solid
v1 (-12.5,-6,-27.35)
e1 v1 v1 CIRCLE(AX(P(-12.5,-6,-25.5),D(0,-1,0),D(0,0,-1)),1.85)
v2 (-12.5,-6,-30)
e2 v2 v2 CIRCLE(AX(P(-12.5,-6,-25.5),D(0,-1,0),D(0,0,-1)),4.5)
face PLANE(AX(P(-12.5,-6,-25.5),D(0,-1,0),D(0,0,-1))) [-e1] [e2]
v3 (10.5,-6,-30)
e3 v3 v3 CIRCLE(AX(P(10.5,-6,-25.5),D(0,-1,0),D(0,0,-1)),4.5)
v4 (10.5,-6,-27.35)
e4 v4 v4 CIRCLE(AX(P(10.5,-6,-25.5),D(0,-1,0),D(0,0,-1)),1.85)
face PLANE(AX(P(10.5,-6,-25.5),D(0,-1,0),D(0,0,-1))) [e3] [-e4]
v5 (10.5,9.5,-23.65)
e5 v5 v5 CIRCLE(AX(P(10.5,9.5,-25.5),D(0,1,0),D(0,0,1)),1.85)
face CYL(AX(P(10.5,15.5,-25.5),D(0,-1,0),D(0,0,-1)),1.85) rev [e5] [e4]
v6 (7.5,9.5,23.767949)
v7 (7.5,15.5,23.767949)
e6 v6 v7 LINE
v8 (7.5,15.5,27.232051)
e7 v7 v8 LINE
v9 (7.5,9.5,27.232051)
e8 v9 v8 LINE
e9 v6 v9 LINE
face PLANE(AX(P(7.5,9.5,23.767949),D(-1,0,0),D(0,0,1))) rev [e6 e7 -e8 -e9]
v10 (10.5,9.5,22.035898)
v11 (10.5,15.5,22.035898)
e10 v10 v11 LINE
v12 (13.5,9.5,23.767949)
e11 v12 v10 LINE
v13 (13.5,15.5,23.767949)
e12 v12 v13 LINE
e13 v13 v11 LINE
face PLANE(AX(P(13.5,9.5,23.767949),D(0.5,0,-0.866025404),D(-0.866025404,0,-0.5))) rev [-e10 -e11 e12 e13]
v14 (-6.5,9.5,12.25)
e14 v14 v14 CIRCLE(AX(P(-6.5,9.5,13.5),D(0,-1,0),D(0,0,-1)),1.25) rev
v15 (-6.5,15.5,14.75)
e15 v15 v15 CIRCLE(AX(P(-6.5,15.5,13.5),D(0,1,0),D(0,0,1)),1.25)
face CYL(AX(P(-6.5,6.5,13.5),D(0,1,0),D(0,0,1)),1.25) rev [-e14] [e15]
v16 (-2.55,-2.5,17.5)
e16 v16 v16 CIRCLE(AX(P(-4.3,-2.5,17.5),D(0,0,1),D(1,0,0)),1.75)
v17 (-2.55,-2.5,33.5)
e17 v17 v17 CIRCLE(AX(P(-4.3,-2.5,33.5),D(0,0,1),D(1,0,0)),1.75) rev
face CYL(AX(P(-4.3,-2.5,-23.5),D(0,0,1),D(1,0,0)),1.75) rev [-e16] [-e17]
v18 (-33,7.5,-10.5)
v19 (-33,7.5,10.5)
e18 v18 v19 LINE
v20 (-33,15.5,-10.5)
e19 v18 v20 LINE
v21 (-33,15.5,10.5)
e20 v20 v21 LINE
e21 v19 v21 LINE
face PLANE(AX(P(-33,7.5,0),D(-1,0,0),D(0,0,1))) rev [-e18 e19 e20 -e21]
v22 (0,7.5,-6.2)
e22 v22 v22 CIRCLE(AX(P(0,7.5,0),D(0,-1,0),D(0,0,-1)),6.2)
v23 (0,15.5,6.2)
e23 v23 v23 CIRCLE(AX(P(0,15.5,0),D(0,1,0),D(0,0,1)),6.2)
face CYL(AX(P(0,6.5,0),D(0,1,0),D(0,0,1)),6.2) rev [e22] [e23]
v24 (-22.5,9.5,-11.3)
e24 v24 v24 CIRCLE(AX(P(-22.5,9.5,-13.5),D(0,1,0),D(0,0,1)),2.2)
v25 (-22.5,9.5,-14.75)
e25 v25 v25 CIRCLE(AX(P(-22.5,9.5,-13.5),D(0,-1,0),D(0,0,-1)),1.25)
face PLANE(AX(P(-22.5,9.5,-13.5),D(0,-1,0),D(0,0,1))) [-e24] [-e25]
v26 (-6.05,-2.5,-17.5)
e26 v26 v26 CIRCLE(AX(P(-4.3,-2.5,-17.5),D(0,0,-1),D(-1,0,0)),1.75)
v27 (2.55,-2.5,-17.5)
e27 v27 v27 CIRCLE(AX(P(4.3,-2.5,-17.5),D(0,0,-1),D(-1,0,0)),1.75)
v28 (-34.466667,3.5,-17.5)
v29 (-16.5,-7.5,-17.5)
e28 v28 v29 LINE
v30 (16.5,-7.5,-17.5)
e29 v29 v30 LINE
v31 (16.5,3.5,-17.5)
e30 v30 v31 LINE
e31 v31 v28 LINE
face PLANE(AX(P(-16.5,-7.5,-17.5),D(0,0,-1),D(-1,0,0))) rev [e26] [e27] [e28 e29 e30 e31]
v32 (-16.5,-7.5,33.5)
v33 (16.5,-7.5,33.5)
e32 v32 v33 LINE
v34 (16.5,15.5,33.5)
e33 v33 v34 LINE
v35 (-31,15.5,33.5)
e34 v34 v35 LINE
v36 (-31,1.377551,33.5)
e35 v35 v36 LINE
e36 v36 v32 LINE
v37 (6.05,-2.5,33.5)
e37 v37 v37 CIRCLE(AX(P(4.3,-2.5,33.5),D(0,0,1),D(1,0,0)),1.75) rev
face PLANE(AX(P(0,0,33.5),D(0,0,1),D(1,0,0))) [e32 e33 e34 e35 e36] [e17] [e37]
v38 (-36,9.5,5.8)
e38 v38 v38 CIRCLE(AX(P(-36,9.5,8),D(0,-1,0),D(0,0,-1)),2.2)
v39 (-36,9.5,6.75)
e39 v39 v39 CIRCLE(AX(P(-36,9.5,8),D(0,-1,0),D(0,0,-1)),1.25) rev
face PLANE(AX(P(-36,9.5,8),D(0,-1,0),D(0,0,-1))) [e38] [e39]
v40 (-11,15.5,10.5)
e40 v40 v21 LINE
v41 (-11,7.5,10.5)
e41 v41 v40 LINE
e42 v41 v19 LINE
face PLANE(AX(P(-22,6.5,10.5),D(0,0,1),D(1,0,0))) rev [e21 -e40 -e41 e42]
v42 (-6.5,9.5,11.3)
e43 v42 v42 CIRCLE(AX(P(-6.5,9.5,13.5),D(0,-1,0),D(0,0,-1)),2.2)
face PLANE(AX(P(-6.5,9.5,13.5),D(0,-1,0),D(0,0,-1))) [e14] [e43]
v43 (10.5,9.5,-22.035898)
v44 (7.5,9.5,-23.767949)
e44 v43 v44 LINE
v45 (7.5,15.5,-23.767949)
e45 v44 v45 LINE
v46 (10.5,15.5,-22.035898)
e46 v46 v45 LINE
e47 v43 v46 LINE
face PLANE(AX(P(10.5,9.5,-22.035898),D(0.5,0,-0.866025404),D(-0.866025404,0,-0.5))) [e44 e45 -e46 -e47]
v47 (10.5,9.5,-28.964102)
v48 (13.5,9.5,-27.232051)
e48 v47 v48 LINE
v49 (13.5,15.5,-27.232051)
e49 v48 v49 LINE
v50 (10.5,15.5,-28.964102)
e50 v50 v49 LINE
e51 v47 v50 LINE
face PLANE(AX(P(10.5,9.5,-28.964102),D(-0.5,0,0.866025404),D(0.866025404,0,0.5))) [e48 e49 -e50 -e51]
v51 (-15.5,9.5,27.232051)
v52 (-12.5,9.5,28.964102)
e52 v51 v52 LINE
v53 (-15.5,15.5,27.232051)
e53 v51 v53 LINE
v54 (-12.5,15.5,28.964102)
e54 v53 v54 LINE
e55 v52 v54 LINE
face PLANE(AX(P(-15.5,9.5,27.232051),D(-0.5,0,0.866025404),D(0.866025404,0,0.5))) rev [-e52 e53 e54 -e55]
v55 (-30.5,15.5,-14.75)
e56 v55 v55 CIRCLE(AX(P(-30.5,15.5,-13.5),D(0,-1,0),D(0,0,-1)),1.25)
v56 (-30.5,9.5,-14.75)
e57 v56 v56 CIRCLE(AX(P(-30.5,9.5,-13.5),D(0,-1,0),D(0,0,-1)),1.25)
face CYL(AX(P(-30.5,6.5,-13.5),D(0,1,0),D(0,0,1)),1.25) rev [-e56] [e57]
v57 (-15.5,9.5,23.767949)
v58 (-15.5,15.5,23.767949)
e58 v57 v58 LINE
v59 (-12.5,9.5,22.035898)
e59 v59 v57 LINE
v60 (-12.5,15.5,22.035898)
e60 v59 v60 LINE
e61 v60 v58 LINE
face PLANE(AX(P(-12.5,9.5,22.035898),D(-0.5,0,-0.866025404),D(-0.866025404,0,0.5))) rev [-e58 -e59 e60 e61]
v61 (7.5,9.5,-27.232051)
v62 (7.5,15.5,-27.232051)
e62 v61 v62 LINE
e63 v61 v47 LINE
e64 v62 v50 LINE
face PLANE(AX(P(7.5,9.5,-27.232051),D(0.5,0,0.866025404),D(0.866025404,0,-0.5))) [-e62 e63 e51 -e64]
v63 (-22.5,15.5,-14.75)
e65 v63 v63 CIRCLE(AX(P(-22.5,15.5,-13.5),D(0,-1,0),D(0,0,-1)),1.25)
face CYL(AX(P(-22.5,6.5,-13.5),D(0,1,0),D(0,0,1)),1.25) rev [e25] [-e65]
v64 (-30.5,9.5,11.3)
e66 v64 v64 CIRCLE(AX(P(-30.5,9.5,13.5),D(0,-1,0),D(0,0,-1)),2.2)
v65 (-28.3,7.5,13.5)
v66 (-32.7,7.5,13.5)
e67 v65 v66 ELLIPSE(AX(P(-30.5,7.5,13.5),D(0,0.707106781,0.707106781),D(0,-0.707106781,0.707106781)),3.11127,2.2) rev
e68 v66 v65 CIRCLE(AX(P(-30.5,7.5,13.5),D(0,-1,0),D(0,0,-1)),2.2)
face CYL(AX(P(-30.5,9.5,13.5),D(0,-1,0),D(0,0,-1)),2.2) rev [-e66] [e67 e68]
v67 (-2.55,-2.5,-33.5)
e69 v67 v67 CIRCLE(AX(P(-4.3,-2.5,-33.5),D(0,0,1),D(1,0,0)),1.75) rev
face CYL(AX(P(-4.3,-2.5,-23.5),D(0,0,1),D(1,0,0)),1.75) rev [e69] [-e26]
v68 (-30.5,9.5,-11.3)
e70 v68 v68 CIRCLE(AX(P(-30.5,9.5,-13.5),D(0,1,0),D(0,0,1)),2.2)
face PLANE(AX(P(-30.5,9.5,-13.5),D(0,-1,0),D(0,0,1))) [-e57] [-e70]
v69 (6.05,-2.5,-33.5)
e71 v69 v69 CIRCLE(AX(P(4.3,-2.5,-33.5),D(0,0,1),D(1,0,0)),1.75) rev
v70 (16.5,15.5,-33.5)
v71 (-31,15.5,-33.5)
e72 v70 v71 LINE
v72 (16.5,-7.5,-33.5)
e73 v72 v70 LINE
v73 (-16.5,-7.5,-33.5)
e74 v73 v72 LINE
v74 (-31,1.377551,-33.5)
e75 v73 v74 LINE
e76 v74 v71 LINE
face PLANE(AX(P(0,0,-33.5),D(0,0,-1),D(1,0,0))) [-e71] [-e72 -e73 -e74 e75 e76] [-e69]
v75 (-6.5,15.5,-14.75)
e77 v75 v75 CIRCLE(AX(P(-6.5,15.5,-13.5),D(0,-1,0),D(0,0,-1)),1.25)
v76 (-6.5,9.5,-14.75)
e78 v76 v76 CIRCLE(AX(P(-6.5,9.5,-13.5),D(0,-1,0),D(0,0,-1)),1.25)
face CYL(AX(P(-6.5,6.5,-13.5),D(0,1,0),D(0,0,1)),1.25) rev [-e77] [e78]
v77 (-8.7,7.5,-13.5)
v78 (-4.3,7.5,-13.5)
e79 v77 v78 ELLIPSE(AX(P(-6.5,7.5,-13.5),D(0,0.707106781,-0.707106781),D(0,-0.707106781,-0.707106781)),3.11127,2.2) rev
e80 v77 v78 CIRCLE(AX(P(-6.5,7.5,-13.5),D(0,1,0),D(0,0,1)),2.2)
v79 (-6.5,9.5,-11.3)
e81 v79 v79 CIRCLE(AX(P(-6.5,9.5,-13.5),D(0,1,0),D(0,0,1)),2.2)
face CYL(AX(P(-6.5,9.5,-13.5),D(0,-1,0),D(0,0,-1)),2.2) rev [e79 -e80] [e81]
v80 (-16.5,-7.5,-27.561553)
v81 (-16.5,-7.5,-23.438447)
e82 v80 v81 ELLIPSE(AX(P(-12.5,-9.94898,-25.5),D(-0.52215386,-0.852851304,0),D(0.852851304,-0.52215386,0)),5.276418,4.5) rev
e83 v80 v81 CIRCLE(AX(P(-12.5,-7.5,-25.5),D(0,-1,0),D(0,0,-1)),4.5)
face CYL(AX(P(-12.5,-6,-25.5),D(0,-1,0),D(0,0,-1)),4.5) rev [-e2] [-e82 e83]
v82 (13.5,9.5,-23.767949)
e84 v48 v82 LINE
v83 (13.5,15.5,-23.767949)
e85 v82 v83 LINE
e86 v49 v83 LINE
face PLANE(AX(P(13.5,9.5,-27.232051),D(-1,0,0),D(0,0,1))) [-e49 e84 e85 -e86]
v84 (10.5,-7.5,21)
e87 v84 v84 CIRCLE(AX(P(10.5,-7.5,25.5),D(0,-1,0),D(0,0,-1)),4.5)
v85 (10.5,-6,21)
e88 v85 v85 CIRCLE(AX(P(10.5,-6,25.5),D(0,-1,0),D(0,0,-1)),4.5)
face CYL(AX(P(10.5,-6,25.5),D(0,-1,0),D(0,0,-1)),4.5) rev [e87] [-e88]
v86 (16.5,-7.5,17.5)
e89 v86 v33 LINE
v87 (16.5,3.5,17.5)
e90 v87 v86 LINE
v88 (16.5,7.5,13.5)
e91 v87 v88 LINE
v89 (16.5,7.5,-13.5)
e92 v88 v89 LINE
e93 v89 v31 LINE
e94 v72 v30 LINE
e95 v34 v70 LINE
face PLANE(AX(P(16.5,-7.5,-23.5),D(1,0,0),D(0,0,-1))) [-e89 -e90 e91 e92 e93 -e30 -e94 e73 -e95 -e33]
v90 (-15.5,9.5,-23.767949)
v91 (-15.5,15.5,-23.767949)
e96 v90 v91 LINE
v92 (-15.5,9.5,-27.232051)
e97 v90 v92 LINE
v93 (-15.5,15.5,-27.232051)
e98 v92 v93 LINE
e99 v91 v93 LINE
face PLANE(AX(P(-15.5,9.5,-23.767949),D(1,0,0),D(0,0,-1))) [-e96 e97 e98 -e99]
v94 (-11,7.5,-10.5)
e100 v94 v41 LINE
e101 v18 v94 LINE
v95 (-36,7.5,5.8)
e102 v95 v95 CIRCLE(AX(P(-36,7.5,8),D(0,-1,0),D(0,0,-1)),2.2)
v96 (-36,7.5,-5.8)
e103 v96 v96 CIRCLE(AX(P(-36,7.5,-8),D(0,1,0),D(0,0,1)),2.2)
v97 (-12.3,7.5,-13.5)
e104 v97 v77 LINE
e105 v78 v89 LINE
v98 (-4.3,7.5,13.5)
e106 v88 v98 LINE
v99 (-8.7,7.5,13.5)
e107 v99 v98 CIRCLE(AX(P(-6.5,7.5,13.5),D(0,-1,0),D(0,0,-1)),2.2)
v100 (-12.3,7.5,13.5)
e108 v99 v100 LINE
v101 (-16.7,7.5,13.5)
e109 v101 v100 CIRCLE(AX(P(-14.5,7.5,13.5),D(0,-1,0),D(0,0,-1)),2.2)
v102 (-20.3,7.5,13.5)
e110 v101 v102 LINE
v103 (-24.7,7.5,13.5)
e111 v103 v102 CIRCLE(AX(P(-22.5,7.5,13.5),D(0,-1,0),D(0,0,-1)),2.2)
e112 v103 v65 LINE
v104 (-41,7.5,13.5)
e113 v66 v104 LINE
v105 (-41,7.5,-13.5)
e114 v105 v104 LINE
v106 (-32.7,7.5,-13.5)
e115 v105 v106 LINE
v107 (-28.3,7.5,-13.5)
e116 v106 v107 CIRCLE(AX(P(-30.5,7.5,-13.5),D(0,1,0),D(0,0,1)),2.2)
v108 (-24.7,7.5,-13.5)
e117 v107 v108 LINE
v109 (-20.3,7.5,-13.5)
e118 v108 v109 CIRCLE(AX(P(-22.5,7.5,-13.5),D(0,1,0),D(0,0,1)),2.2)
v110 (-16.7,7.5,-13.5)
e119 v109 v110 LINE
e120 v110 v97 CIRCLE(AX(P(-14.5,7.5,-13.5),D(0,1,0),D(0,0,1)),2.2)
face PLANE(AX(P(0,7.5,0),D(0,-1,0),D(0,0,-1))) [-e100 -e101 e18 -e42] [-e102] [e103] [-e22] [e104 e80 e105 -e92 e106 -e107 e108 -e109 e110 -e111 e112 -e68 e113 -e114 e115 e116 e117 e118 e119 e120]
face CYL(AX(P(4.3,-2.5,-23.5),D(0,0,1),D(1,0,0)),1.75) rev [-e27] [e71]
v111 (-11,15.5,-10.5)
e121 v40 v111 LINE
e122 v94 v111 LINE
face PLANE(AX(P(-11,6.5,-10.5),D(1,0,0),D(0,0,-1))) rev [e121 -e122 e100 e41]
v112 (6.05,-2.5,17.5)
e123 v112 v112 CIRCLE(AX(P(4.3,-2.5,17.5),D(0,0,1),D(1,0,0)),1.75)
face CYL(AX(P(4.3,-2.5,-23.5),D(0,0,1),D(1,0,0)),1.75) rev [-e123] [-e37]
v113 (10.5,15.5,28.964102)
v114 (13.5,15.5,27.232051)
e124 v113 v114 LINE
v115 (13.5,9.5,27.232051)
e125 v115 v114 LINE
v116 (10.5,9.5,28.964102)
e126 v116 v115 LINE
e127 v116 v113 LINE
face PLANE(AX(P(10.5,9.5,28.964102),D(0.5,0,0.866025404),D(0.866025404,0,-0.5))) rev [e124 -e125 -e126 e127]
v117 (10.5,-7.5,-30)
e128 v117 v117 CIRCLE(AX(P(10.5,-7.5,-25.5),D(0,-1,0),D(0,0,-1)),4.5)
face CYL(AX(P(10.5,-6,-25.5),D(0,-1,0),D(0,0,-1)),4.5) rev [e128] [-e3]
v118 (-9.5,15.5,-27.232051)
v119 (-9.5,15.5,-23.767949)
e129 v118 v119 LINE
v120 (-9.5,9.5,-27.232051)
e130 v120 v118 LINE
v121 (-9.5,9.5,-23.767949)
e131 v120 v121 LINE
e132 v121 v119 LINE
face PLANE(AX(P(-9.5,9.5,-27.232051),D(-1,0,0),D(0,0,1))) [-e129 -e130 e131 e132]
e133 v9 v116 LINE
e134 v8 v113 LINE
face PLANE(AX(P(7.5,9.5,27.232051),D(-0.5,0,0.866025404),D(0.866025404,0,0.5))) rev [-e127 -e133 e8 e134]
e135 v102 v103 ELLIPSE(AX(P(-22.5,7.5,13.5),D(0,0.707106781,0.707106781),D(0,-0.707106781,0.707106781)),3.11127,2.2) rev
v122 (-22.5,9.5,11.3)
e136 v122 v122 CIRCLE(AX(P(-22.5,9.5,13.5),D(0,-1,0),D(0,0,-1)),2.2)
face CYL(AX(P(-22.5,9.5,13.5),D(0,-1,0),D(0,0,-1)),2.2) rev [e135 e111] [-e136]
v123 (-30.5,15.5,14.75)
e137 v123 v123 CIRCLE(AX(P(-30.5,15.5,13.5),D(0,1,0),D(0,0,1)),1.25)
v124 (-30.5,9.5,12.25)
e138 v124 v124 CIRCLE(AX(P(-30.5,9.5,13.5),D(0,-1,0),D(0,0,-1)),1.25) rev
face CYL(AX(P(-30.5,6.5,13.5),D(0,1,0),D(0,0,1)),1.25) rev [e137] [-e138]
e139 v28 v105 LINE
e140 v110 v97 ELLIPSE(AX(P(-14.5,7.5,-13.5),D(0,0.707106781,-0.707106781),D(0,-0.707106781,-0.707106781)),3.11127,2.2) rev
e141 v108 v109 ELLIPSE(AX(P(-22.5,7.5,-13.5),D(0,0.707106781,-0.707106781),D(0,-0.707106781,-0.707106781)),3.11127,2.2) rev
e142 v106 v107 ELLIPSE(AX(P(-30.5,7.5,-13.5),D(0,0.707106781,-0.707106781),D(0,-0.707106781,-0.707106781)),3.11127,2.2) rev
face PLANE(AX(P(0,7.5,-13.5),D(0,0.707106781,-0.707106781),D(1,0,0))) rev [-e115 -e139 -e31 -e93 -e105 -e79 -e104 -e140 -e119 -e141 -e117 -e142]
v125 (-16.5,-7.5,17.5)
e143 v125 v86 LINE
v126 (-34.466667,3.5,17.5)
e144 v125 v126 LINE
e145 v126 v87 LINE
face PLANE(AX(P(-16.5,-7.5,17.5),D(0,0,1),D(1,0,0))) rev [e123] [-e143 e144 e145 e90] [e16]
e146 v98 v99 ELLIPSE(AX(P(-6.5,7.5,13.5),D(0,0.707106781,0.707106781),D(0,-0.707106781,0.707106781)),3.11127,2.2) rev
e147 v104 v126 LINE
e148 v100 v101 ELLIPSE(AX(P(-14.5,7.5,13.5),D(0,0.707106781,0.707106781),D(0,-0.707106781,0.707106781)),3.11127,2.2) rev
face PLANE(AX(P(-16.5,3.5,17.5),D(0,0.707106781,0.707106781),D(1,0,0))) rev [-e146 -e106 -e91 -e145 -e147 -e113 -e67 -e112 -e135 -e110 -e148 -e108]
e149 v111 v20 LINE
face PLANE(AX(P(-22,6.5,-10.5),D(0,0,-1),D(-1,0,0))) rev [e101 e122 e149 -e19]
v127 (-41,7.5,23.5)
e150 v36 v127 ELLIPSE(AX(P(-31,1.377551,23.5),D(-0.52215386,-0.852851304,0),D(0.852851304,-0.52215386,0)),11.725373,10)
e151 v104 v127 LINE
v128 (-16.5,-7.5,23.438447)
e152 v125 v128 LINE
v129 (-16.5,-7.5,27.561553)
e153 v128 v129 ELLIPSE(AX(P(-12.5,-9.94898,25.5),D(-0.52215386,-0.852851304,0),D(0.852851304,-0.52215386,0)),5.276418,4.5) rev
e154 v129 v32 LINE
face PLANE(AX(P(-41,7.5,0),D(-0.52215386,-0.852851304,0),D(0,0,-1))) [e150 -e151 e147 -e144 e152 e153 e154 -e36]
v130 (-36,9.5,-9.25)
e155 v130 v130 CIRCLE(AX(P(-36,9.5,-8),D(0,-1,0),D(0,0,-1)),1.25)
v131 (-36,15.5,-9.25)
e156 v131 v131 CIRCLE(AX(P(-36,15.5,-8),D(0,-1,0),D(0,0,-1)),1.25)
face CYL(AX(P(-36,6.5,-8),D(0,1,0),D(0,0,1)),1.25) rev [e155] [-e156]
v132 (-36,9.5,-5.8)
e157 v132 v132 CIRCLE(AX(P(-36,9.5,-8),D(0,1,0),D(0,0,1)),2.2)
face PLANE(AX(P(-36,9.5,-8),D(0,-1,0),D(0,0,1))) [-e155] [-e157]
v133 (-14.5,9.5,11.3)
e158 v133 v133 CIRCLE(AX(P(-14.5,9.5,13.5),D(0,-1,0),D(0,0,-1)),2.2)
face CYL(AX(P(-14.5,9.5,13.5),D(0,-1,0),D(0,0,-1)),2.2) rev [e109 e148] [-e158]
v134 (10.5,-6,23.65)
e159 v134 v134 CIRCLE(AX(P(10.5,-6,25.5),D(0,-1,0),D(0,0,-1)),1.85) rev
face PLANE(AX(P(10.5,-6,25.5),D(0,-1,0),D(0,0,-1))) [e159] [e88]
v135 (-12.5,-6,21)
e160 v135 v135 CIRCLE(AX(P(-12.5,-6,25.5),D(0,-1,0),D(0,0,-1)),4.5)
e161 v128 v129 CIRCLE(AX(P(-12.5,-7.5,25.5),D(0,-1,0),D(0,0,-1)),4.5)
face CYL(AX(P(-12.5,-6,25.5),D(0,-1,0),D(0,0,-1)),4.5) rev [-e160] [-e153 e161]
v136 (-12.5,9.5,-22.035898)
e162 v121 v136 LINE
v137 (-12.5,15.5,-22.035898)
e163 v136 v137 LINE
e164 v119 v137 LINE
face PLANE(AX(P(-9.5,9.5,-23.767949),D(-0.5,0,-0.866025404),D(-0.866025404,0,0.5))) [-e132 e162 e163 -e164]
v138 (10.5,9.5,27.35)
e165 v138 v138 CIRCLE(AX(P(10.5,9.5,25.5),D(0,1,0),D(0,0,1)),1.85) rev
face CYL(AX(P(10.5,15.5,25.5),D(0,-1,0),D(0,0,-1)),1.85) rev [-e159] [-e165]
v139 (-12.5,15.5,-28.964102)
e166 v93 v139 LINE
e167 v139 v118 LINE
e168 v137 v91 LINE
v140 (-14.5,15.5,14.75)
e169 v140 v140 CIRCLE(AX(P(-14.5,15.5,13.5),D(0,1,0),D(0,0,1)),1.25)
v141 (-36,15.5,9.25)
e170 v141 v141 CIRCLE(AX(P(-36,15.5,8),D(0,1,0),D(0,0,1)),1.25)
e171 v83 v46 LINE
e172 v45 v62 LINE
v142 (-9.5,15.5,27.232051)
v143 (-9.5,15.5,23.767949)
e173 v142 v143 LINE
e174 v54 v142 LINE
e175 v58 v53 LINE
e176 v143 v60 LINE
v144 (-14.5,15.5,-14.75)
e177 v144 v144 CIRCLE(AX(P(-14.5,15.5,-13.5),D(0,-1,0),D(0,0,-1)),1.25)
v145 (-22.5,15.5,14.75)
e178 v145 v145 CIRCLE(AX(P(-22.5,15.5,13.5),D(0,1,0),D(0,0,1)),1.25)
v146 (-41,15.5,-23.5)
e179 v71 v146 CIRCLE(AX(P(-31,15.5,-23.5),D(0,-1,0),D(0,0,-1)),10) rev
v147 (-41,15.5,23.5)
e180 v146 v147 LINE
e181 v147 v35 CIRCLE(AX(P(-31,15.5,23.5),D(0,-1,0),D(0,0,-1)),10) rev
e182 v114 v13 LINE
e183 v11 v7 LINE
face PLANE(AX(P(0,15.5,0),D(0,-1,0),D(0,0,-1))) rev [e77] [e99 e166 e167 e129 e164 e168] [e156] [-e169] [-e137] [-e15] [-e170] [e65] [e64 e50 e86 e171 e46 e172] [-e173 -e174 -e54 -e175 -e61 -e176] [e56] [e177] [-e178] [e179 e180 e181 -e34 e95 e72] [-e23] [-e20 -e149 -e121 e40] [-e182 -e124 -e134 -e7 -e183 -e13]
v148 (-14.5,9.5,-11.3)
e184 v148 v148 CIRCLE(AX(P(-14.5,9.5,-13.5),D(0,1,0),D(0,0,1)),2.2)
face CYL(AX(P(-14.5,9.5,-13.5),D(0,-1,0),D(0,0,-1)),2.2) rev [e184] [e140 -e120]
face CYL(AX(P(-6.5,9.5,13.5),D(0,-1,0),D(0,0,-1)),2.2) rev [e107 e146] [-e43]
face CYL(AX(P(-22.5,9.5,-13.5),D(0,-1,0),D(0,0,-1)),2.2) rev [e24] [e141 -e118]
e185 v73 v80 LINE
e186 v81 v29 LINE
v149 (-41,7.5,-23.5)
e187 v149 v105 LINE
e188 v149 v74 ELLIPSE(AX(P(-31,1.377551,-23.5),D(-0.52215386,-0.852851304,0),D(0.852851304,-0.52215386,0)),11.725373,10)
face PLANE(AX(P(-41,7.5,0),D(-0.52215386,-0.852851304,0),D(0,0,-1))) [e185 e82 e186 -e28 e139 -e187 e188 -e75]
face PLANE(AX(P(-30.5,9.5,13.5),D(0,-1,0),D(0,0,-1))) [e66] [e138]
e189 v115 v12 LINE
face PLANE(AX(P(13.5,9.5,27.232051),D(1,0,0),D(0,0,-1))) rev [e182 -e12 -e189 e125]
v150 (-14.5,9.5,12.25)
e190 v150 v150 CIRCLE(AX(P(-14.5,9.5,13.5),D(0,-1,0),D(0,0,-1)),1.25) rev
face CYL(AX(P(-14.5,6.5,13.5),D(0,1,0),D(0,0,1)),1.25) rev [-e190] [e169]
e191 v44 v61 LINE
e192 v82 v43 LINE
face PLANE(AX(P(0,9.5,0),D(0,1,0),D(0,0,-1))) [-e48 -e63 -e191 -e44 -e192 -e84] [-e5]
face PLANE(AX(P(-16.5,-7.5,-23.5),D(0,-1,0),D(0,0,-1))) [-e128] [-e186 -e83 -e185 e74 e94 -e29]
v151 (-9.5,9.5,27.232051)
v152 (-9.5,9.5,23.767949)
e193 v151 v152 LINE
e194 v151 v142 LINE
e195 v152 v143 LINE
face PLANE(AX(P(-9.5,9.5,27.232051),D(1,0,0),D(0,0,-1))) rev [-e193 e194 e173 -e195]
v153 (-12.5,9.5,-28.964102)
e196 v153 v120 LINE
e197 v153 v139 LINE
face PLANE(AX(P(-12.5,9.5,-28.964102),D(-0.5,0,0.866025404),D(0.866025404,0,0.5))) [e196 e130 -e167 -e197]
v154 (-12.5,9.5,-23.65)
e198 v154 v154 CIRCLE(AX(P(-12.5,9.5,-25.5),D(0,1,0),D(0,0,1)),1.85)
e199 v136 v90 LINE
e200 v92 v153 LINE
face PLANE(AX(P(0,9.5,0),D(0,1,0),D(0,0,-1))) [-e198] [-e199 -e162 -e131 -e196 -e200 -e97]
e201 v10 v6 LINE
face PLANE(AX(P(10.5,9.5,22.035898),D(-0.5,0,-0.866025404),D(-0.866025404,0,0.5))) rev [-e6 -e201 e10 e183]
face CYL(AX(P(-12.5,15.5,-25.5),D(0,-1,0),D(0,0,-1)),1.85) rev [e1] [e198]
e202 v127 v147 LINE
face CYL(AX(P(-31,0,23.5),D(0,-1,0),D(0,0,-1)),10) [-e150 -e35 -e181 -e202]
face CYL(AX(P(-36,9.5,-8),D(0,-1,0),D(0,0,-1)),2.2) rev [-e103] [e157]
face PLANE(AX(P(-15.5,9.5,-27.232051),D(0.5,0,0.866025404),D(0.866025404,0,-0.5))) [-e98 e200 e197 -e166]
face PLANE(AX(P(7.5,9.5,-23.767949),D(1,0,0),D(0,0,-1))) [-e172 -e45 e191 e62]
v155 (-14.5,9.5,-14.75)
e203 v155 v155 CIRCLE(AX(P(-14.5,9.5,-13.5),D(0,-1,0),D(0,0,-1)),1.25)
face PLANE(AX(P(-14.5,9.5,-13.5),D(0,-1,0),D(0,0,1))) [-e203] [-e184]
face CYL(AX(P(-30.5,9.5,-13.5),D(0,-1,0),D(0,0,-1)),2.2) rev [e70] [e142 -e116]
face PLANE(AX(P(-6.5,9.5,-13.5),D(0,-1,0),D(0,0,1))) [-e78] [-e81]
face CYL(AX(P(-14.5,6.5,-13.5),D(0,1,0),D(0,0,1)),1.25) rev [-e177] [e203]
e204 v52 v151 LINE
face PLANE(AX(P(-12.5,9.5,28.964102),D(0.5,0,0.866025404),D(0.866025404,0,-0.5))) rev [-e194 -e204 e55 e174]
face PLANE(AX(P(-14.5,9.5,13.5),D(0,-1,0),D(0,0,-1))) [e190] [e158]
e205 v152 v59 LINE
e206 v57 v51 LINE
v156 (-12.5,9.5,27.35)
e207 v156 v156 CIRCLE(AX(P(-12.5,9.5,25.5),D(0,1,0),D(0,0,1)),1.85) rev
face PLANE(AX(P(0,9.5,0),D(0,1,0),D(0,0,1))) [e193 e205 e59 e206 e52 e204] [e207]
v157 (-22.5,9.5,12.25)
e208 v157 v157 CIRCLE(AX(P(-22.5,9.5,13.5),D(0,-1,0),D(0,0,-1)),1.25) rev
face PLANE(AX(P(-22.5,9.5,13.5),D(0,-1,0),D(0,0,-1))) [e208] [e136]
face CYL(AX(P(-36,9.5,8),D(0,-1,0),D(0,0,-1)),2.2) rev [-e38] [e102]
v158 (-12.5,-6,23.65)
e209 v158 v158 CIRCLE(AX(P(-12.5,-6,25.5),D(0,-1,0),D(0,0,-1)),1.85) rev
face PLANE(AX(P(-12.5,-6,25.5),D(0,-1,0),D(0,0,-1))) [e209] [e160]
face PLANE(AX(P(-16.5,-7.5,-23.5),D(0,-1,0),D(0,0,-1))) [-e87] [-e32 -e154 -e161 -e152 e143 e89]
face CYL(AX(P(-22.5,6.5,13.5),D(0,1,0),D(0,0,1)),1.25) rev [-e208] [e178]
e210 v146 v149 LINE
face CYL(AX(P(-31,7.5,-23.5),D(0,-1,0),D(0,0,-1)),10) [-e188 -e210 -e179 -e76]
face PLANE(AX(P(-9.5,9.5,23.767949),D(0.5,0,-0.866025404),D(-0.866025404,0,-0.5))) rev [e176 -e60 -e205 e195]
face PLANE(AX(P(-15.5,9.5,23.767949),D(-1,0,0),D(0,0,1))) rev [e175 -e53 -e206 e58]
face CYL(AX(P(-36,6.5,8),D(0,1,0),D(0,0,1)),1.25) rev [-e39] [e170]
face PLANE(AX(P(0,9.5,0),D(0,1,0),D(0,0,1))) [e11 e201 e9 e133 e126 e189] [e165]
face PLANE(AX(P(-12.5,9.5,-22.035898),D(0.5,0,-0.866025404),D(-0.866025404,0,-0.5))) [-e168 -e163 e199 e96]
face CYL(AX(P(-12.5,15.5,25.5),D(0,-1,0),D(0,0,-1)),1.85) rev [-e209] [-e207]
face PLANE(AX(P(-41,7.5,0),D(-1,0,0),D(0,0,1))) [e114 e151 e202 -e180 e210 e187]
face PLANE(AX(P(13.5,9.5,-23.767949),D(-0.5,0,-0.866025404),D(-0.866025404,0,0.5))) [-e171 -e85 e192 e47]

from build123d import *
from OCP.BRepFilletAPI import BRepFilletAPI_MakeChamfer

# Parameters (mm, degrees)
DODANIE_WYCI_GNI_CIE1_DEPTH      = 23.5
DODANIE_WYCI_GNI_CIE1_DEPTH_BACK = 23.5
SZKIC1_W                         = 33
SZKIC1_H                         = 15
SZKIC2_W                         = 35
SZKIC2_H                         = 15
WYTNIJ_WYCI_GNI_CIE1_DEPTH       = 42.200728149
SZKIC3_R                         = 1.75
WYTNIJ_WYCI_GNI_CIE2_DEPTH       = 51.373604199
SZKIC4_W                         = 33
SZKIC4_H                         = 47
DODANIE_WYCI_GNI_CIE2_DEPTH      = 8
SZKIC5_R                         = 6.2
SZKIC5_W                         = 11
SZKIC5_H                         = 21
WYTNIJ_WYCI_GNI_CIE3_DEPTH       = 9
DODANIE_WYCI_GNI_CIE3_DEPTH      = 8
SZKIC8_R                         = 1.25
WYTNIJ_WYCI_GNI_CIE4_DEPTH       = 9
SZKIC10_R                        = 2.2
WYTNIJ_WYCI_GNI_CIE5_DEPTH       = 2
SZKIC11_R                        = 1.75
DODANIE_WYCI_GNI_CIE4_DEPTH      = 10
SZKIC12_R                        = 1.85
WYTNIJ_WYCI_GNI_CIE6_DEPTH       = 58.725644215
WYTNIJ_WYCI_GNI_CIE7_DEPTH       = 6
SFAZOWANIE1_SIZE                 = 24.5
SFAZOWANIE1_SIZE_2               = 15
ZAOKR_GLENIE1_R                  = 10
SFAZOWANIE2_SIZE                 = 4
SZKIC14_R                        = 4.5
WYTNIJ_WYCI_GNI_CIE8_DEPTH       = 1.5


# Some blends are built 0.0001 mm under size
with BuildPart() as part:
    # Szkic1 → Dodanie-wyciągnięcie1 (new, two sides: drawn at the far end of the back side and taken through both)
    with BuildSketch(Plane.XY.offset(-DODANIE_WYCI_GNI_CIE1_DEPTH_BACK)):
        Rectangle(SZKIC1_W, SZKIC1_H)
    extrude(amount=DODANIE_WYCI_GNI_CIE1_DEPTH + DODANIE_WYCI_GNI_CIE1_DEPTH_BACK)

    # Szkic2 → Wytnij-wyciągnięcie1 (cut, through all)
    with BuildSketch(Plane(origin=(16.5, 0, 0), x_dir=(0, 0, -1), z_dir=(1, 0, 0))):
        Rectangle(SZKIC2_W, SZKIC2_H)
    extrude(amount=-WYTNIJ_WYCI_GNI_CIE1_DEPTH, mode=Mode.SUBTRACT)


with BuildPart() as wytnij_wyci_gni_cie1_piece_1:
    # of the separate pieces the step leaves, piece 1, a body of its own (wytnij_wyci_gni_cie1_pieces)
    add(part.part.solids().sort_by_distance((-16.5, -7.5, -17.5))[0])


with BuildPart() as wytnij_wyci_gni_cie1_piece_2:
    # of the separate pieces the step leaves, piece 2, a body of its own (wytnij_wyci_gni_cie1_pieces)
    add(part.part.solids().sort_by_distance((-16.5, -7.5, 23.5))[0])


with BuildPart() as wytnij_wyci_gni_cie2_tool:
    # Szkic3 → Wytnij-wyciągnięcie2 (new, through all)
    with BuildSketch(Plane.XY.offset(23.5)):
        with Locations((-4.3, -2.5)):
            Circle(SZKIC3_R)
        with Locations((4.3, -2.5)):
            Circle(SZKIC3_R)
    extrude(amount=-WYTNIJ_WYCI_GNI_CIE2_DEPTH)


with BuildPart() as wytnij_wyci_gni_cie1_piece_1_1:
    add(wytnij_wyci_gni_cie1_piece_1.part)

    # Wytnij-wyciągnięcie2: cut by wytnij_wyci_gni_cie2_tool
    add(wytnij_wyci_gni_cie2_tool.part, mode=Mode.SUBTRACT)



with BuildPart() as wytnij_wyci_gni_cie1_piece_2_1:
    add(wytnij_wyci_gni_cie1_piece_2.part)

    # Wytnij-wyciągnięcie2: cut by wytnij_wyci_gni_cie2_tool
    add(wytnij_wyci_gni_cie2_tool.part, mode=Mode.SUBTRACT)


with BuildPart() as wytnij_wyci_gni_cie1_piece_1_2:
    add(wytnij_wyci_gni_cie1_piece_1_1.part)

    add(wytnij_wyci_gni_cie1_piece_2_1.part)  # Dodanie-wyciągnięcie2 merges Wytnij-wyciągnięcie1 piece 2
    # Szkic4 → Dodanie-wyciągnięcie2 (add)
    with BuildSketch(Plane(origin=(0, 7.5, 0), x_dir=(1, 0, 0), z_dir=(0, 1, 0))):
        Rectangle(SZKIC4_W, SZKIC4_H)
    extrude(amount=DODANIE_WYCI_GNI_CIE2_DEPTH)

    # Szkic5 → Wytnij-wyciągnięcie3 (cut)
    with BuildSketch(Plane(origin=(0, 15.5, 0), x_dir=(1, 0, 0), z_dir=(0, 1, 0))):
        with Locations(Location((0, 0, 0), (0, 0, 270))):
            Circle(SZKIC5_R)
        with Locations((-16.5, 0)):
            Rectangle(SZKIC5_W, SZKIC5_H)
    extrude(amount=-WYTNIJ_WYCI_GNI_CIE3_DEPTH, mode=Mode.SUBTRACT)

    # Szkic7 → Dodanie-wyciągnięcie3 (add)
    with BuildSketch(Plane(origin=(0, 15.5, 0), x_dir=(1, 0, 0), z_dir=(0, 1, 0))):
        Polygon((-16.5, 10.5), (-16.5, 23.5), (-33, 23.5), (-41, 23.5), (-41, -23.5), (-33, -23.5), (-16.5, -23.5), (-16.5, -10.5), (-33, -10.5), (-33, 10.5), align=None)
    extrude(amount=-DODANIE_WYCI_GNI_CIE3_DEPTH)

    # Szkic8 → Wytnij-wyciągnięcie4 (cut)
    with BuildSketch(Plane(origin=(0, 15.5, 0), x_dir=(1, 0, 0), z_dir=(0, 1, 0))):
        with Locations(Location((-30.5, -13.5, 0), (0, 0, 270))):
            Circle(SZKIC8_R)
        with Locations(Location((-36, -8, 0), (0, 0, 270))):
            Circle(SZKIC8_R)
        with Locations(Location((-22.5, -13.5, 0), (0, 0, 270))):
            Circle(SZKIC8_R)
        with Locations(Location((-14.5, -13.5, 0), (0, 0, 270))):
            Circle(SZKIC8_R)
        with Locations(Location((-6.5, -13.5, 0), (0, 0, 270))):
            Circle(SZKIC8_R)
    wytnij_wyci_gni_cie4 = extrude(amount=-WYTNIJ_WYCI_GNI_CIE4_DEPTH, mode=Mode.SUBTRACT)

    # Szkic10 → Wytnij-wyciągnięcie5 (cut)
    with BuildSketch(Plane.XZ.offset(-7.5)):
        with Locations(Location((-36, 8, 0), (0, 0, 270))):
            Circle(SZKIC10_R)
        with Locations(Location((-30.5, 13.5, 0), (0, 0, 270))):
            Circle(SZKIC10_R)
        with Locations(Location((-22.5, 13.5, 0), (0, 0, 270))):
            Circle(SZKIC10_R)
        with Locations(Location((-14.5, 13.5, 0), (0, 0, 270))):
            Circle(SZKIC10_R)
        with Locations(Location((-6.5, 13.5, 0), (0, 0, 270))):
            Circle(SZKIC10_R)
    wytnij_wyci_gni_cie5 = extrude(amount=-WYTNIJ_WYCI_GNI_CIE5_DEPTH, mode=Mode.SUBTRACT)

    # Lustro2: Wytnij-wyciągnięcie4, Wytnij-wyciągnięcie5 across plane
    add(wytnij_wyci_gni_cie4.mirror(Plane.XY), mode=Mode.SUBTRACT)
    add(wytnij_wyci_gni_cie5.mirror(Plane.XY), mode=Mode.SUBTRACT)

    # Szkic11 → Dodanie-wyciągnięcie4 (add)
    with BuildSketch(Plane.XY.offset(23.5)):
        Polygon((-16.5, 7.5), (-16.5, -7.5), (16.5, -7.5), (16.5, 15.5), (-41, 15.5), (-41, 7.5), align=None)
        with Locations((-4.3, -2.5)):
            Circle(SZKIC11_R, mode=Mode.SUBTRACT)
        with Locations((4.3, -2.5)):
            Circle(SZKIC11_R, mode=Mode.SUBTRACT)
    dodanie_wyci_gni_cie4 = extrude(amount=DODANIE_WYCI_GNI_CIE4_DEPTH)

    # Szkic12 → Wytnij-wyciągnięcie6 (cut, through all)
    with BuildSketch(Plane.XZ.offset(7.5)):
        with Locations(Location((-12.5, 25.5, 0), (0, 0, 270))):
            Circle(SZKIC12_R)
        with Locations(Location((10.5, 25.5, 0), (0, 0, 270))):
            Circle(SZKIC12_R)
    wytnij_wyci_gni_cie6 = extrude(amount=-WYTNIJ_WYCI_GNI_CIE6_DEPTH, mode=Mode.SUBTRACT)

    # Szkic13 → Wytnij-wyciągnięcie7 (cut)
    with BuildSketch(Plane(origin=(0, 15.5, 0), x_dir=(1, 0, 0), z_dir=(0, 1, 0))):
        Polygon((-12.5, -22.035898385), (-15.5, -23.767949192), (-15.5, -27.232050808), (-12.5, -28.964101615), (-9.5, -27.232050808), (-9.5, -23.767949192), align=None)
        Polygon((10.5, -22.035898385), (7.5, -23.767949192), (7.5, -27.232050808), (10.5, -28.964101615), (13.5, -27.232050808), (13.5, -23.767949192), align=None)
    wytnij_wyci_gni_cie7 = extrude(amount=-WYTNIJ_WYCI_GNI_CIE7_DEPTH, mode=Mode.SUBTRACT)

    # Lustro6: Dodanie-wyciągnięcie4, Wytnij-wyciągnięcie6, Wytnij-wyciągnięcie7 across plane
    add(dodanie_wyci_gni_cie4.mirror(Plane.XY))
    add(wytnij_wyci_gni_cie6.mirror(Plane.XY), mode=Mode.SUBTRACT)
    add(wytnij_wyci_gni_cie7.mirror(Plane.XY), mode=Mode.SUBTRACT)

    # Sfazowanie1
    sfazowanie1_edges_1 = [wytnij_wyci_gni_cie1_piece_1_2.edges().sort_by_distance(p)[0] for p in [
        (-16.5, 7.5, -28.5),
    ]]
    sfazowanie1_side_1 = [wytnij_wyci_gni_cie1_piece_1_2.faces().sort_by_distance(p)[0] for p in [
        (-16.8, 7.5, -28.5),
    ]]
    sfazowanie1_edges_2 = [wytnij_wyci_gni_cie1_piece_1_2.edges().sort_by_distance(p)[0] for p in [
        (-16.5, 7.5, 25.5),
    ]]
    sfazowanie1_side_2 = [wytnij_wyci_gni_cie1_piece_1_2.faces().sort_by_distance(p)[0] for p in [
        (-16.5, 7.2, 25.5),
    ]]
    sfazowanie1 = BRepFilletAPI_MakeChamfer(wytnij_wyci_gni_cie1_piece_1_2.part.solid().wrapped)
    for e in sfazowanie1_edges_1:
        sfazowanie1.Add(SFAZOWANIE1_SIZE - 0.0001, SFAZOWANIE1_SIZE_2 - 0.0001, e.wrapped, sfazowanie1_side_1[0].wrapped)
    for e in sfazowanie1_edges_2:
        sfazowanie1.Add(SFAZOWANIE1_SIZE_2 - 0.0001, SFAZOWANIE1_SIZE - 0.0001, e.wrapped, sfazowanie1_side_2[0].wrapped)
    add(Compound.cast(sfazowanie1.Shape()), mode=Mode.REPLACE)  # a hair under: the kernel refuses the full size

    # Zaokrąglenie1
    zaokr_glenie1_edges = [wytnij_wyci_gni_cie1_piece_1_2.edges().sort_by_distance(p)[0] for p in [
        (-41, 11.5, 33.5),
        (-41, 11.5, -33.5),
    ]]
    fillet(zaokr_glenie1_edges, radius=ZAOKR_GLENIE1_R)

    # Sfazowanie2
    # the kernel refuses this chamfer: 4 mm, written as the material it adds along each edge
    with BuildSketch(Plane(origin=(-51.286631952, 7.5, -17.5), x_dir=(0, 0.02749587661058627, 0.9996219169112968), z_dir=(1, 0, 0))) as sfazowanie2_piece_1_section:
        Polygon((SFAZOWANIE2_SIZE * 0.999621916911, SFAZOWANIE2_SIZE * 0.0274958766106), (-SFAZOWANIE2_SIZE * 0.0274958766106, SFAZOWANIE2_SIZE * 0.999621916911), (0, 0), align=None)
    sfazowanie2_piece_1 = extrude(amount=67.786631952, mode=Mode.PRIVATE)
    sfazowanie2_piece_1 = split(sfazowanie2_piece_1, bisect_by=Plane(origin=(-41, 6.15842539, -16.26773288), z_dir=(1, 0, 0)), keep=Keep.TOP, mode=Mode.PRIVATE)
    sfazowanie2_piece_1 = split(sfazowanie2_piece_1, bisect_by=Plane(origin=(-18.343955111, -6.370950809, -16.26773288), z_dir=(0.5221528778597931, 0.852851905164511, 0)), keep=Keep.TOP, mode=Mode.PRIVATE)
    sfazowanie2_piece_1 = sfazowanie2_piece_1 - Plane(origin=(-30.5, 6.15842539, -13.5), x_dir=(0, 0, 1), z_dir=(0, -1, 0)) * Cylinder(2.2, 152, mode=Mode.PRIVATE)
    sfazowanie2_piece_1 = sfazowanie2_piece_1 - Plane(origin=(-22.5, 6.15842539, -13.5), x_dir=(0, 0, 1), z_dir=(0, -1, 0)) * Cylinder(2.2, 152, mode=Mode.PRIVATE)
    sfazowanie2_piece_1 = sfazowanie2_piece_1 - Plane(origin=(-14.5, 6.15842539, -13.5), x_dir=(0, 0, 1), z_dir=(0, -1, 0)) * Cylinder(2.2, 152, mode=Mode.PRIVATE)
    sfazowanie2_piece_1 = sfazowanie2_piece_1 - Plane(origin=(-6.5, 6.15842539, -13.5), x_dir=(0, 0, 1), z_dir=(0, -1, 0)) * Cylinder(2.2, 152, mode=Mode.PRIVATE)
    add(sfazowanie2_piece_1)
    with BuildSketch(Plane(origin=(-51.286631952, 7.5, 17.5), x_dir=(0, 0.02749587661058627, -0.9996219169112968), z_dir=(1, 0, 0))) as sfazowanie2_piece_2_section:
        Polygon((SFAZOWANIE2_SIZE * 0.999621916911, -SFAZOWANIE2_SIZE * 0.0274958766106), (-SFAZOWANIE2_SIZE * 0.0274958766106, -SFAZOWANIE2_SIZE * 0.999621916911), (0, 0), align=None)
    sfazowanie2_piece_2 = extrude(amount=67.786631952, mode=Mode.PRIVATE)
    sfazowanie2_piece_2 = split(sfazowanie2_piece_2, bisect_by=Plane(origin=(-18.343955111, -6.370950809, 16.26773288), z_dir=(0.5221528778597931, 0.8528519051645109, 0)), keep=Keep.TOP, mode=Mode.PRIVATE)
    sfazowanie2_piece_2 = split(sfazowanie2_piece_2, bisect_by=Plane(origin=(-41, 6.15842539, 16.26773288), z_dir=(1, 0, 0)), keep=Keep.TOP, mode=Mode.PRIVATE)
    sfazowanie2_piece_2 = sfazowanie2_piece_2 - Plane(origin=(-30.5, 6.15842539, 13.5), x_dir=(0, 0, -1), z_dir=(0, -1, 0)) * Cylinder(2.2, 152, mode=Mode.PRIVATE)
    sfazowanie2_piece_2 = sfazowanie2_piece_2 - Plane(origin=(-22.5, 6.15842539, 13.5), x_dir=(0, 0, -1), z_dir=(0, -1, 0)) * Cylinder(2.2, 152, mode=Mode.PRIVATE)
    sfazowanie2_piece_2 = sfazowanie2_piece_2 - Plane(origin=(-14.5, 6.15842539, 13.5), x_dir=(0, 0, -1), z_dir=(0, -1, 0)) * Cylinder(2.2, 152, mode=Mode.PRIVATE)
    sfazowanie2_piece_2 = sfazowanie2_piece_2 - Plane(origin=(-6.5, 6.15842539, 13.5), x_dir=(0, 0, -1), z_dir=(0, -1, 0)) * Cylinder(2.2, 152, mode=Mode.PRIVATE)
    add(sfazowanie2_piece_2)

    # Szkic14 → Wytnij-wyciągnięcie8 (cut)
    with BuildSketch(Plane.XZ.offset(7.5)):
        with Locations(Location((-12.5, 25.5, 0), (0, 0, 270))):
            Circle(SZKIC14_R)
        with Locations(Location((10.5, 25.5, 0), (0, 0, 270))):
            Circle(SZKIC14_R)
        with Locations(Location((10.5, -25.5, 0), (0, 0, 270))):
            Circle(SZKIC14_R)
        with Locations(Location((-12.5, -25.5, 0), (0, 0, 270))):
            Circle(SZKIC14_R)
    extrude(amount=-WYTNIJ_WYCI_GNI_CIE8_DEPTH, mode=Mode.SUBTRACT)


solid = wytnij_wyci_gni_cie1_piece_1_2.part
